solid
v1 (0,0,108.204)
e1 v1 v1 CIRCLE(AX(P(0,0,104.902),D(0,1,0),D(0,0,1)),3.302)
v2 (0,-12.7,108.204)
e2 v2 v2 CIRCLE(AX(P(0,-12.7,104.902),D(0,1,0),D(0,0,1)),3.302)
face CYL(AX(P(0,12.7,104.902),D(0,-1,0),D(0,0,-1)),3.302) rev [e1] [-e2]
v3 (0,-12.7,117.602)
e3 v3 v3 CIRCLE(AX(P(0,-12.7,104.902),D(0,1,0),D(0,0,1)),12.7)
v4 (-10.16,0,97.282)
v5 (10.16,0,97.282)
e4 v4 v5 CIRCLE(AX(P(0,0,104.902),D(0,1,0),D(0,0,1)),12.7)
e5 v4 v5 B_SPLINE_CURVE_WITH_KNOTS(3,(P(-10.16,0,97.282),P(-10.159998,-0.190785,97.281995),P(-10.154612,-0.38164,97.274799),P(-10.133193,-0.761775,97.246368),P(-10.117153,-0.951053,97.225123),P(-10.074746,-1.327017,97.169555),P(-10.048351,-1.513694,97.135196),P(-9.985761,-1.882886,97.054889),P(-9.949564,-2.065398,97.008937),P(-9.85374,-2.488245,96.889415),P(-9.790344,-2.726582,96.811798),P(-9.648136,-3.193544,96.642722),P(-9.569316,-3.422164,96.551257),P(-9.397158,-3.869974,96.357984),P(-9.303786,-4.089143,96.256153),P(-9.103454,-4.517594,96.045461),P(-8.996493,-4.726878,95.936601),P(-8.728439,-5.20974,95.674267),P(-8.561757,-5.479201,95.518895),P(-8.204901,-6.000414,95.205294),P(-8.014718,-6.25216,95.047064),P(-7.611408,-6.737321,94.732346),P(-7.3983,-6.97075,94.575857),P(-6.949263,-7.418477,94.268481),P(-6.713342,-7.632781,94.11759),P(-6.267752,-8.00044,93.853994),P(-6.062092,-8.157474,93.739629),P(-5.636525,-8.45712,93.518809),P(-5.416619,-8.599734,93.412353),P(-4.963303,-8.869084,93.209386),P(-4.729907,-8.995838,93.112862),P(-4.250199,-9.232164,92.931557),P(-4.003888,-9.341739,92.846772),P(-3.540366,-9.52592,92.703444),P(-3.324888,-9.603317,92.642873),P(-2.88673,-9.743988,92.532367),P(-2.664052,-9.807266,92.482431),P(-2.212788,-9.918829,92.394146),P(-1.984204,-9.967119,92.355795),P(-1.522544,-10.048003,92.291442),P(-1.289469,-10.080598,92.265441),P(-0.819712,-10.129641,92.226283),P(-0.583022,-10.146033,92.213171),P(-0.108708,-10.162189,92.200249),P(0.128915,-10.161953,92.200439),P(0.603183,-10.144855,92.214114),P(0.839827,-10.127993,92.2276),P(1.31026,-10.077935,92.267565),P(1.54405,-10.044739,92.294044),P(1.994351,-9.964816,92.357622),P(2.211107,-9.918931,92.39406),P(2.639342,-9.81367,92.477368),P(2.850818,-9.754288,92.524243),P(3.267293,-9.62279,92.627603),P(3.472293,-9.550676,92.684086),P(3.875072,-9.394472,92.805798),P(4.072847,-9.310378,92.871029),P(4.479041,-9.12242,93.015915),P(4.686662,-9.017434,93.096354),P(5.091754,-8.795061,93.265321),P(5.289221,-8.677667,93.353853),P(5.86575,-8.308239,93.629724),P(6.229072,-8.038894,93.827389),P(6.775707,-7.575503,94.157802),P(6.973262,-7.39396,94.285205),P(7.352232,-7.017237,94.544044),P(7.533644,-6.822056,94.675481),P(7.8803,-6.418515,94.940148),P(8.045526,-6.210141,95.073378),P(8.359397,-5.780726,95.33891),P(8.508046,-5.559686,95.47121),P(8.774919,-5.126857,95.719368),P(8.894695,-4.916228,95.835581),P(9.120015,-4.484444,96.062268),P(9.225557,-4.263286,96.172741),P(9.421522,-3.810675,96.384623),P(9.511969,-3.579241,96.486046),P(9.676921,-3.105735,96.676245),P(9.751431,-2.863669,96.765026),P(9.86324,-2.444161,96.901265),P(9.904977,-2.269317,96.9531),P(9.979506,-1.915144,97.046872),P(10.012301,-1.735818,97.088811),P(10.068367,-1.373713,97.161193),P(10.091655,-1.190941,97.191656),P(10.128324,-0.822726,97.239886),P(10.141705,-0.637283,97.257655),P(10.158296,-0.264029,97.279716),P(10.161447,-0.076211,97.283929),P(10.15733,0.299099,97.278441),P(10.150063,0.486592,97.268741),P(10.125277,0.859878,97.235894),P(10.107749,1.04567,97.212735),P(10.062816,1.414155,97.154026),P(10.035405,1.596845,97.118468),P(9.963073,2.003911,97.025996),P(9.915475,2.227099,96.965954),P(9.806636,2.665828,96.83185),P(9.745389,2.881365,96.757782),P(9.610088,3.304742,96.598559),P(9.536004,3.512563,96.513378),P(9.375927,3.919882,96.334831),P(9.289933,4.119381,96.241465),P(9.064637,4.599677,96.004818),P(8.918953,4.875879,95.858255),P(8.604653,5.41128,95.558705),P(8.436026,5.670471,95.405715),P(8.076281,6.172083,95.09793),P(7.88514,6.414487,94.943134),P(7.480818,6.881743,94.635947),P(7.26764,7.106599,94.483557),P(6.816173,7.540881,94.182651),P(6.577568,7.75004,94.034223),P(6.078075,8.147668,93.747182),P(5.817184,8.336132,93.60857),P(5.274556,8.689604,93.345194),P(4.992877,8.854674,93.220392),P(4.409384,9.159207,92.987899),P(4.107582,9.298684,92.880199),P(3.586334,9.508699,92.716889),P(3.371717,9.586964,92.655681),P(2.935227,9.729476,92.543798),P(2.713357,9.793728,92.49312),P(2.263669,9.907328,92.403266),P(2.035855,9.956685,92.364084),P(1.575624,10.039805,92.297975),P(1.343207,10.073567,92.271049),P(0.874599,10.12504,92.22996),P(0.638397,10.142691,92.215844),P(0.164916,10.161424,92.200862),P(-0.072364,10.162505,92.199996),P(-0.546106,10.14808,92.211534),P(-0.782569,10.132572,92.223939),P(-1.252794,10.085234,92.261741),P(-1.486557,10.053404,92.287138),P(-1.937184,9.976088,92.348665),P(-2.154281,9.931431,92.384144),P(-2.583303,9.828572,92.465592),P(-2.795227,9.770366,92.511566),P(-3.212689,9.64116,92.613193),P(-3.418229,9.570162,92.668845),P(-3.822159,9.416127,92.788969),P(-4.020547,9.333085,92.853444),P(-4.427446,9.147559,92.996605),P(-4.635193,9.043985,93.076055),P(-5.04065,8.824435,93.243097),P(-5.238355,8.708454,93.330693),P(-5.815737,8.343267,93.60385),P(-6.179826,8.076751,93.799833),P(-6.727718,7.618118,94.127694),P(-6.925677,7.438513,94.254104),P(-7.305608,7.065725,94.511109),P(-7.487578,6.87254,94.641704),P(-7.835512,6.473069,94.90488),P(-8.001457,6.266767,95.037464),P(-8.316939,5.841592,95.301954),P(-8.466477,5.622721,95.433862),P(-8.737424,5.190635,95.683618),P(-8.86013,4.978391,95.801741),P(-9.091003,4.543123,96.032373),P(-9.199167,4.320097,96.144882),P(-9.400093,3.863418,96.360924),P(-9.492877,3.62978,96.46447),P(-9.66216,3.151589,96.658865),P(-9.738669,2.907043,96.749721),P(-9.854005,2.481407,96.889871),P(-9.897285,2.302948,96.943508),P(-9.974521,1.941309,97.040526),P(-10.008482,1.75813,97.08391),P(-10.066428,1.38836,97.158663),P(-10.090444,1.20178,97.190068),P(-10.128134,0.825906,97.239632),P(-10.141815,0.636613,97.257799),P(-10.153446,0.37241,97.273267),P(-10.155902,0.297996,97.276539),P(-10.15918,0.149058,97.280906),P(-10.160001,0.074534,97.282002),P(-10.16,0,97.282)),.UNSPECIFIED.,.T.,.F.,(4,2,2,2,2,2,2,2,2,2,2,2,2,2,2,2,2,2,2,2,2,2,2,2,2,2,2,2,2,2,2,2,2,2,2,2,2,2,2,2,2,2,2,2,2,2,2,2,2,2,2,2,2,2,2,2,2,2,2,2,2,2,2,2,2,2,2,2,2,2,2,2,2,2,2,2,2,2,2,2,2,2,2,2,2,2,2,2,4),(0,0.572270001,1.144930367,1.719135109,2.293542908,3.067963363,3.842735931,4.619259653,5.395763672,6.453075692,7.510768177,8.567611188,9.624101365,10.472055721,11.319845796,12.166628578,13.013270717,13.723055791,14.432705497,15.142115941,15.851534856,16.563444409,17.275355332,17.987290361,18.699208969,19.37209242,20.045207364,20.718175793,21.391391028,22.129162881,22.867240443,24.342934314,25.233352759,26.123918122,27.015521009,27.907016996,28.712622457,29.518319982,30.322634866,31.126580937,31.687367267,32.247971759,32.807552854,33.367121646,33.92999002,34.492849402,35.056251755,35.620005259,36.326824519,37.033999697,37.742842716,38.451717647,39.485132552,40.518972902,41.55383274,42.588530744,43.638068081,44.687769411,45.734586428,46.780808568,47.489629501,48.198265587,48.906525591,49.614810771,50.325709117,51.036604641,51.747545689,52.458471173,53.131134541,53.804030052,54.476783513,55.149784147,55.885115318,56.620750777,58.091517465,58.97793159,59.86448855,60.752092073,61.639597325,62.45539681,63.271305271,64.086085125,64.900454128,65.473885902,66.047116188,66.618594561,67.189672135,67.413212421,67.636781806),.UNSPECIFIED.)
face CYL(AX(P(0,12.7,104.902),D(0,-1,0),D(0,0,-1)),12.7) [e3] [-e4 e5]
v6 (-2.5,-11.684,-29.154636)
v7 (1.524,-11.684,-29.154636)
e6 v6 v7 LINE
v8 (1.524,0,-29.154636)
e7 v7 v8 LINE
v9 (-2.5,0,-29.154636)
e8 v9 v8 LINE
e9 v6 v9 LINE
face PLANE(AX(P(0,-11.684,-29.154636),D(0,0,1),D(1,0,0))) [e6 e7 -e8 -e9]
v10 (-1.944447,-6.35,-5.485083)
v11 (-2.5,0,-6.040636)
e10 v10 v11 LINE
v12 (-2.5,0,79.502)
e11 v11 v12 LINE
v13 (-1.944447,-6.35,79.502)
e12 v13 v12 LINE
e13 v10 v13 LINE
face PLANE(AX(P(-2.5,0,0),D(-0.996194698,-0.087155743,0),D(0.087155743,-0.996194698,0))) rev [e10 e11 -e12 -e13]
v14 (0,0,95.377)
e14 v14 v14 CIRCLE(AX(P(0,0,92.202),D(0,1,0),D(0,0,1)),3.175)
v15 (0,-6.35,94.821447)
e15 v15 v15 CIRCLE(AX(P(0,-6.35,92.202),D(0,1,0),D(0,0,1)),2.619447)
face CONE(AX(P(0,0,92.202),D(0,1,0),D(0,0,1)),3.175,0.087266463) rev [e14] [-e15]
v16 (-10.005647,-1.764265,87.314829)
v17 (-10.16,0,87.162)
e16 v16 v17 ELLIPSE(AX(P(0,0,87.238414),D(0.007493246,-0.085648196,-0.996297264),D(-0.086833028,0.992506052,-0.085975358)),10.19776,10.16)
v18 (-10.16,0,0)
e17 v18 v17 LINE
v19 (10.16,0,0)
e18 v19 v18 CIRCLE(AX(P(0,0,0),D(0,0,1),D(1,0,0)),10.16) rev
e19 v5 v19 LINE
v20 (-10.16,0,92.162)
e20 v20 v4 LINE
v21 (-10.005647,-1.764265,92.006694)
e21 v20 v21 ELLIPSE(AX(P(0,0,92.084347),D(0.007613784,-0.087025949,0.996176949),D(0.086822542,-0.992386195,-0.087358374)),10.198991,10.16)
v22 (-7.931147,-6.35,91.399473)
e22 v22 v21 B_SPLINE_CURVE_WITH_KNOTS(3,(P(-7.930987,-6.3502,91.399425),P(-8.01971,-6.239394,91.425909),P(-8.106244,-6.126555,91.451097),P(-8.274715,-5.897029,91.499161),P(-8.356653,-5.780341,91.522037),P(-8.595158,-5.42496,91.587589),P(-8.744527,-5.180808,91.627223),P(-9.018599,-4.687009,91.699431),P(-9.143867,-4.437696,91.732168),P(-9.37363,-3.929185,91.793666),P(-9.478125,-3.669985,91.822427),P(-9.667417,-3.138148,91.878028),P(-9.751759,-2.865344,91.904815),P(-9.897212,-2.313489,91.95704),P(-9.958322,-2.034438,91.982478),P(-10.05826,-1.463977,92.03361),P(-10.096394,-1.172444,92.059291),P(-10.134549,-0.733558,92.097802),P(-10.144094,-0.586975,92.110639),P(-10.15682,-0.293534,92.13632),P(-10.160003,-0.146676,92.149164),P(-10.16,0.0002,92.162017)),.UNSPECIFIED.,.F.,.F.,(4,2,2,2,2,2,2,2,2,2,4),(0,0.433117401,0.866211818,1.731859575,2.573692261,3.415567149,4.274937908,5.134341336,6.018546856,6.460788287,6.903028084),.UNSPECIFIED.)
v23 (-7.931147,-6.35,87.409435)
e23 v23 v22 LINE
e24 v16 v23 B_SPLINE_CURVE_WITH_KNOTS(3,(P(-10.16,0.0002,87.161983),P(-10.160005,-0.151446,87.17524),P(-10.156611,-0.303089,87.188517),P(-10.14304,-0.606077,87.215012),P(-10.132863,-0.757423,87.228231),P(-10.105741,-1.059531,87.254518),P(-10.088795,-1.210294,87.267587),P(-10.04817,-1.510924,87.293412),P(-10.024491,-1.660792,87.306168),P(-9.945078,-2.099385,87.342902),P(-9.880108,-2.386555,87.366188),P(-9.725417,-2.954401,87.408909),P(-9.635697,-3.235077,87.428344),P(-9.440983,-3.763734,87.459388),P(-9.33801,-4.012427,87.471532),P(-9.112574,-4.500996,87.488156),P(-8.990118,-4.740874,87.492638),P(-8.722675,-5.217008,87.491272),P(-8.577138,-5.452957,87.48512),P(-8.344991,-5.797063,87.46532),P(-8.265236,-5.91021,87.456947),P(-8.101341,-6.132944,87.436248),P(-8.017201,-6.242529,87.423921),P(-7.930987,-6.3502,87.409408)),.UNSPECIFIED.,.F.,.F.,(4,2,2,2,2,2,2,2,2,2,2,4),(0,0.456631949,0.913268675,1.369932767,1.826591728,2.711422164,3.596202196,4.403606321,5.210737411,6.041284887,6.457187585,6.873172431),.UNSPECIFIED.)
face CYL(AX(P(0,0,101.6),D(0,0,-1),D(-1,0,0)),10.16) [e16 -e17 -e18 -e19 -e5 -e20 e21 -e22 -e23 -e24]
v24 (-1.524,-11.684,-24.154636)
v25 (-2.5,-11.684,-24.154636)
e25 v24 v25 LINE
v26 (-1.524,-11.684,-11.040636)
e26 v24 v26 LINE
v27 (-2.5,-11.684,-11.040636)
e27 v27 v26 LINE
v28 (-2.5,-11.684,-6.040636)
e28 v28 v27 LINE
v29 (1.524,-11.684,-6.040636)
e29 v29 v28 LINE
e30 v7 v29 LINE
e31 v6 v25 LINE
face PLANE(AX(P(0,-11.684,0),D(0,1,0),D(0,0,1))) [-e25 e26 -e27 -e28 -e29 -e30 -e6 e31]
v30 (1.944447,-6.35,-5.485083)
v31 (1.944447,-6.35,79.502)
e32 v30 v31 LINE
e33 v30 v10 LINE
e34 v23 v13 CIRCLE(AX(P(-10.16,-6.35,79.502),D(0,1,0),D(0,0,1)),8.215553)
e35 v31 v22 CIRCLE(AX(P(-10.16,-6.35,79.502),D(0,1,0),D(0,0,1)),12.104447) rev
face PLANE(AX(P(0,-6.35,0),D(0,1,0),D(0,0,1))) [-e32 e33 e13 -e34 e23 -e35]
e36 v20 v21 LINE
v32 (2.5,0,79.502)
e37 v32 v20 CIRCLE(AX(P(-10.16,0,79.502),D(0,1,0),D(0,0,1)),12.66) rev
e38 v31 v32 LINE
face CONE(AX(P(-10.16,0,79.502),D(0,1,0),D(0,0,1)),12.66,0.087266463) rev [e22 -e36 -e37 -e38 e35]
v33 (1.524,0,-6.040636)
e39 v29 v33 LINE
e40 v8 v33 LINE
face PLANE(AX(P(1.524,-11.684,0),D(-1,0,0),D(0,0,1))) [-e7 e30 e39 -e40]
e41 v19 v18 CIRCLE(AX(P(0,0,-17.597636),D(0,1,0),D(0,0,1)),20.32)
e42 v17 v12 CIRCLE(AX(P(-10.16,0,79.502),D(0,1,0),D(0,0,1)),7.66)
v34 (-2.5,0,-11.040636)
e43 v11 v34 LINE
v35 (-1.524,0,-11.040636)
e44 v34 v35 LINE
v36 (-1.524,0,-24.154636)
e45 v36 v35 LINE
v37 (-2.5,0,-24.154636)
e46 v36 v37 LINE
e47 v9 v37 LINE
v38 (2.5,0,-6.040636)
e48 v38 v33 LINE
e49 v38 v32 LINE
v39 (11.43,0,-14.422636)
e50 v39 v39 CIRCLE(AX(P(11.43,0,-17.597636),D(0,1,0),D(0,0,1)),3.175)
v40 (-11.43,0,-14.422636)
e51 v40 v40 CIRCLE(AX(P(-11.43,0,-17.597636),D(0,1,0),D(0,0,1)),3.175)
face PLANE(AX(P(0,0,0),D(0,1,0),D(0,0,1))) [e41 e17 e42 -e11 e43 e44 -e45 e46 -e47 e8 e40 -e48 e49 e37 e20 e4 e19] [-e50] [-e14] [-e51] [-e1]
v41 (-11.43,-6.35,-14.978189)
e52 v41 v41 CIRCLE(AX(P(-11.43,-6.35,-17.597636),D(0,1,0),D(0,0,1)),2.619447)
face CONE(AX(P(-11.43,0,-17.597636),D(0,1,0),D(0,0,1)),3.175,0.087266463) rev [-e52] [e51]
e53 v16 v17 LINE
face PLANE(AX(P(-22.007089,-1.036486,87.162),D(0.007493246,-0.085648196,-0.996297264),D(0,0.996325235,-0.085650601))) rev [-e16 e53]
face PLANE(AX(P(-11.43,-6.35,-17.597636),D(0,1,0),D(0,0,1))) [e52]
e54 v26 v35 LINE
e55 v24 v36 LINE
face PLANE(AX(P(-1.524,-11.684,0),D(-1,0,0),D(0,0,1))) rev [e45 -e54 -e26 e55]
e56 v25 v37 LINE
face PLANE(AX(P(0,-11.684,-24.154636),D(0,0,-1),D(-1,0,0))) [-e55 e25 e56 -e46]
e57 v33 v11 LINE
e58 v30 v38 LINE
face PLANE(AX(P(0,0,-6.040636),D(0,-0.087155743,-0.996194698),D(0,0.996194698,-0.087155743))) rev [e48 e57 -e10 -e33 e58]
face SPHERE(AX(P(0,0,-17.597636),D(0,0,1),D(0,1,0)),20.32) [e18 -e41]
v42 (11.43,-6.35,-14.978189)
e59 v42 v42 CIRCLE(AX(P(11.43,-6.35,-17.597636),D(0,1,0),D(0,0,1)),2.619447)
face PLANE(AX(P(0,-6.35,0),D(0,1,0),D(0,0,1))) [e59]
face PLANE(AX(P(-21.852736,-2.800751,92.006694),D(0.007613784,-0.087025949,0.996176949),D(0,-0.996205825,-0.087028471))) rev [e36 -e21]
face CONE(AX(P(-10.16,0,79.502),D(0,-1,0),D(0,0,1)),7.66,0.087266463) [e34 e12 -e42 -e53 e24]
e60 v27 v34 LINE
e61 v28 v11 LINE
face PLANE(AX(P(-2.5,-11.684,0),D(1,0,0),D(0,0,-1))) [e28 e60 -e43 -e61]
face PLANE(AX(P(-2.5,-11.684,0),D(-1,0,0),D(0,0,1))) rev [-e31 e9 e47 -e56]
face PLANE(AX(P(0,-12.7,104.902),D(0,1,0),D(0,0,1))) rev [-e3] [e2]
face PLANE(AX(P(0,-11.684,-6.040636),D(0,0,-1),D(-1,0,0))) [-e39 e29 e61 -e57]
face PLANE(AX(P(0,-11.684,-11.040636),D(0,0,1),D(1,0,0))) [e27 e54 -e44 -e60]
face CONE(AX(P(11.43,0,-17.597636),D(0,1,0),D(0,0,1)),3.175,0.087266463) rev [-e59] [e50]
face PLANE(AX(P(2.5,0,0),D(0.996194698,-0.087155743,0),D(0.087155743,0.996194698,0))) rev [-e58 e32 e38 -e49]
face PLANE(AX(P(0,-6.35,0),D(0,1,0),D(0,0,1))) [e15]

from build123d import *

# Parameters (mm, degrees)
SKETCH1_R                    = 10.16
BOSS_EXTRUDE1_DEPTH          = 101.6
SKETCH3_R                    = 12.7
SKETCH3_R_2                  = 3.302
BOSS_EXTRUDE2_DEPTH          = 12.7
SKETCH5_W                    = 50.328091527
SKETCH5_H                    = 177.713548071
CUT_EXTRUDE2_DEPTH           = 122.062113097
SKETCH4_W                    = 0.976
SKETCH4_H                    = 5
CUT_EXTRUDE3_DEPTH           = 11.684
CUT_EXTRUDE4_DEPTH           = 6.35
CUT_EXTRUDE4_DRAFT           = -5
SKETCH4_3_R                  = 3.175
CUT_EXTRUDE4_PROFILE_2_DEPTH = 6.35
CUT_EXTRUDE4_PROFILE_2_DRAFT = -5
CUT_EXTRUDE4_PROFILE_3_DEPTH = 6.35
CUT_EXTRUDE4_PROFILE_3_DRAFT = -5
CUT_EXTRUDE4_PROFILE_4_DEPTH = 6.35
CUT_EXTRUDE4_PROFILE_4_DRAFT = -5
CUT_EXTRUDE5_DEPTH           = 124.013791019


with BuildPart() as part:
    # Sketch1 → Boss-Extrude1 (new body)
    with BuildSketch(Plane.XY):
        Circle(SKETCH1_R)
    extrude(amount=BOSS_EXTRUDE1_DEPTH)

    # Sketch2 → Revolve1 (revolve)
    with BuildSketch(Plane(origin=(0, 0, 0), x_dir=(0, 0, -1), z_dir=(1, 0, 0))):
        with BuildLine():
            ThreePointArc((37.917636205, 0), (17.597636205, 20.32), (-2.722363795, 0))
            Line((-2.722363795, 0), (37.917636205, 0))
        make_face()
    revolve(axis=Axis((0, 0, 2.722363795), (0, 0, -1)))

    # Sketch3 → Boss-Extrude2 (add, symmetric)
    with BuildSketch(Plane(origin=(0, 0, 0), x_dir=(1, 0, 0), z_dir=(0, 1, 0))):
        with Locations((0, -104.902)):
            Circle(SKETCH3_R)
        with Locations((0, -104.902)):
            Circle(SKETCH3_R_2, mode=Mode.SUBTRACT)
    extrude(amount=BOSS_EXTRUDE2_DEPTH, both=True)

    # Sketch5 → Cut-Extrude2 (cut, through all)
    with BuildSketch(Plane(origin=(0, 0, 0), x_dir=(1, 0, 0), z_dir=(0, 1, 0))):
        with Locations((0.842814929, -41.287007492)):
            Rectangle(SKETCH5_W, SKETCH5_H)
    extrude(amount=CUT_EXTRUDE2_DEPTH, mode=Mode.SUBTRACT)

    # Sketch4 → Cut-Extrude3 (cut)
    with BuildSketch(Plane(origin=(0, 0, 0), x_dir=(1, 0, 0), z_dir=(0, 1, 0))):
        Polygon((-1.524, 11.040636205), (-1.524, 6.040636205), (1.524, 6.040636205), (1.524, 29.154636205), (-1.524, 29.154636205), (-1.524, 24.154636205), align=None)
        with Locations((-2.012, 8.540636205)):
            Rectangle(SKETCH4_W, SKETCH4_H)
        with Locations((-2.012, 26.654636205)):
            Rectangle(SKETCH4_W, SKETCH4_H)
    extrude(amount=-CUT_EXTRUDE3_DEPTH, mode=Mode.SUBTRACT)


with BuildPart() as cut_extrude4_tool:
    # Sketch4<3> → Cut-Extrude4 (with draft: the straight prism first)
    with BuildSketch(Plane(origin=(0, 0, 0), x_dir=(1, 0, 0), z_dir=(0, 1, 0))):
        with BuildLine():
            ThreePointArc((-2.5, -79.502), (-4.743562056, -84.918437944), (-10.16, -87.162))
            Line((-10.16, -87.162), (-10.16, -92.162))
            ThreePointArc((-10.16, -92.162), (-1.20802815, -88.45397185), (2.5, -79.502))
            Line((2.5, -79.502), (2.5, 6.040636205))
            Line((2.5, 6.040636205), (-2.5, 6.040636205))
            Line((-2.5, 6.040636205), (-2.5, -79.502))
        make_face()
    extrude(amount=-CUT_EXTRUDE4_DEPTH)
    # Cut-Extrude4: the draft: its side faces are tilted about the plane it starts from
    cut_extrude4_sides = [cut_extrude4_tool.faces().sort_by_distance(p)[0] for p in [
        (-4.743562056, -3.175, 84.918437944),
        (-10.16, -3.175, 89.662),
        (-1.20802815, -3.175, 88.45397185),
        (2.5, -3.175, 36.730681898),
        (0, -3.175, -6.040636205),
        (-2.5, -3.175, 36.730681898),
    ]]
    draft(cut_extrude4_sides, Plane(origin=(0, 0, 0), x_dir=(1, 0, 0), z_dir=(0, 1, 0)), CUT_EXTRUDE4_DRAFT)


with BuildPart() as part_1:
    add(part.part)

    # Cut-Extrude4: cut by cut_extrude4_tool
    add(cut_extrude4_tool.part, mode=Mode.SUBTRACT)


with BuildPart() as cut_extrude4_profile_2_tool:
    # Sketch4<3> → Cut-Extrude4 profile 2 (with draft: the straight prism first)
    with BuildSketch(Plane(origin=(0, 0, 0), x_dir=(1, 0, 0), z_dir=(0, 1, 0))):
        with Locations((-11.43, 17.597636205)):
            Circle(SKETCH4_3_R)
    extrude(amount=-CUT_EXTRUDE4_PROFILE_2_DEPTH)
    # Cut-Extrude4 profile 2: the draft: its side faces are tilted about the plane it starts from
    cut_extrude4_profile_2_sides = [cut_extrude4_profile_2_tool.faces().sort_by_distance(p)[0] for p in [
        (-14.605, -3.175, -17.597636205),
    ]]
    draft(cut_extrude4_profile_2_sides, Plane(origin=(0, 0, 0), x_dir=(1, 0, 0), z_dir=(0, 1, 0)), CUT_EXTRUDE4_PROFILE_2_DRAFT)


with BuildPart() as part_2:
    add(part_1.part)

    # Cut-Extrude4 profile 2: cut by cut_extrude4_profile_2_tool
    add(cut_extrude4_profile_2_tool.part, mode=Mode.SUBTRACT)


with BuildPart() as cut_extrude4_profile_3_tool:
    # Sketch4<3> → Cut-Extrude4 profile 3 (with draft: the straight prism first)
    with BuildSketch(Plane(origin=(0, 0, 0), x_dir=(1, 0, 0), z_dir=(0, 1, 0))):
        with Locations((11.43, 17.597636205)):
            Circle(SKETCH4_3_R)
    extrude(amount=-CUT_EXTRUDE4_PROFILE_3_DEPTH)
    # Cut-Extrude4 profile 3: the draft: its side faces are tilted about the plane it starts from
    cut_extrude4_profile_3_sides = [cut_extrude4_profile_3_tool.faces().sort_by_distance(p)[0] for p in [
        (8.255, -3.175, -17.597636205),
    ]]
    draft(cut_extrude4_profile_3_sides, Plane(origin=(0, 0, 0), x_dir=(1, 0, 0), z_dir=(0, 1, 0)), CUT_EXTRUDE4_PROFILE_3_DRAFT)


with BuildPart() as part_3:
    add(part_2.part)

    # Cut-Extrude4 profile 3: cut by cut_extrude4_profile_3_tool
    add(cut_extrude4_profile_3_tool.part, mode=Mode.SUBTRACT)


with BuildPart() as cut_extrude4_profile_4_tool:
    # Sketch4<3> → Cut-Extrude4 profile 4 (with draft: the straight prism first)
    with BuildSketch(Plane(origin=(0, 0, 0), x_dir=(1, 0, 0), z_dir=(0, 1, 0))):
        with Locations((0, -92.202)):
            Circle(SKETCH4_3_R)
    extrude(amount=-CUT_EXTRUDE4_PROFILE_4_DEPTH)
    # Cut-Extrude4 profile 4: the draft: its side faces are tilted about the plane it starts from
    cut_extrude4_profile_4_sides = [cut_extrude4_profile_4_tool.faces().sort_by_distance(p)[0] for p in [
        (-3.175, -3.175, 92.202),
    ]]
    draft(cut_extrude4_profile_4_sides, Plane(origin=(0, 0, 0), x_dir=(1, 0, 0), z_dir=(0, 1, 0)), CUT_EXTRUDE4_PROFILE_4_DRAFT)


with BuildPart() as part_4:
    add(part_3.part)

    # Cut-Extrude4 profile 4: cut by cut_extrude4_profile_4_tool
    add(cut_extrude4_profile_4_tool.part, mode=Mode.SUBTRACT)

    # Sketch7 → Cut-Extrude5 (cut, through all)
    with BuildSketch(Plane(origin=(-10.082823385, -0.882132743, 0), x_dir=(0, 0, -1), z_dir=(0.9961946980917457, 0.08715574274765837, 1.0368733976540235e-15))):
        Polygon((-92.006694168, -0.885502346), (-92.162, 0.885502346), (-87.162, 0.885502346), (-87.314828647, -0.885502346), align=None)
    extrude(amount=-CUT_EXTRUDE5_DEPTH, mode=Mode.SUBTRACT)


solid = part_4.part
